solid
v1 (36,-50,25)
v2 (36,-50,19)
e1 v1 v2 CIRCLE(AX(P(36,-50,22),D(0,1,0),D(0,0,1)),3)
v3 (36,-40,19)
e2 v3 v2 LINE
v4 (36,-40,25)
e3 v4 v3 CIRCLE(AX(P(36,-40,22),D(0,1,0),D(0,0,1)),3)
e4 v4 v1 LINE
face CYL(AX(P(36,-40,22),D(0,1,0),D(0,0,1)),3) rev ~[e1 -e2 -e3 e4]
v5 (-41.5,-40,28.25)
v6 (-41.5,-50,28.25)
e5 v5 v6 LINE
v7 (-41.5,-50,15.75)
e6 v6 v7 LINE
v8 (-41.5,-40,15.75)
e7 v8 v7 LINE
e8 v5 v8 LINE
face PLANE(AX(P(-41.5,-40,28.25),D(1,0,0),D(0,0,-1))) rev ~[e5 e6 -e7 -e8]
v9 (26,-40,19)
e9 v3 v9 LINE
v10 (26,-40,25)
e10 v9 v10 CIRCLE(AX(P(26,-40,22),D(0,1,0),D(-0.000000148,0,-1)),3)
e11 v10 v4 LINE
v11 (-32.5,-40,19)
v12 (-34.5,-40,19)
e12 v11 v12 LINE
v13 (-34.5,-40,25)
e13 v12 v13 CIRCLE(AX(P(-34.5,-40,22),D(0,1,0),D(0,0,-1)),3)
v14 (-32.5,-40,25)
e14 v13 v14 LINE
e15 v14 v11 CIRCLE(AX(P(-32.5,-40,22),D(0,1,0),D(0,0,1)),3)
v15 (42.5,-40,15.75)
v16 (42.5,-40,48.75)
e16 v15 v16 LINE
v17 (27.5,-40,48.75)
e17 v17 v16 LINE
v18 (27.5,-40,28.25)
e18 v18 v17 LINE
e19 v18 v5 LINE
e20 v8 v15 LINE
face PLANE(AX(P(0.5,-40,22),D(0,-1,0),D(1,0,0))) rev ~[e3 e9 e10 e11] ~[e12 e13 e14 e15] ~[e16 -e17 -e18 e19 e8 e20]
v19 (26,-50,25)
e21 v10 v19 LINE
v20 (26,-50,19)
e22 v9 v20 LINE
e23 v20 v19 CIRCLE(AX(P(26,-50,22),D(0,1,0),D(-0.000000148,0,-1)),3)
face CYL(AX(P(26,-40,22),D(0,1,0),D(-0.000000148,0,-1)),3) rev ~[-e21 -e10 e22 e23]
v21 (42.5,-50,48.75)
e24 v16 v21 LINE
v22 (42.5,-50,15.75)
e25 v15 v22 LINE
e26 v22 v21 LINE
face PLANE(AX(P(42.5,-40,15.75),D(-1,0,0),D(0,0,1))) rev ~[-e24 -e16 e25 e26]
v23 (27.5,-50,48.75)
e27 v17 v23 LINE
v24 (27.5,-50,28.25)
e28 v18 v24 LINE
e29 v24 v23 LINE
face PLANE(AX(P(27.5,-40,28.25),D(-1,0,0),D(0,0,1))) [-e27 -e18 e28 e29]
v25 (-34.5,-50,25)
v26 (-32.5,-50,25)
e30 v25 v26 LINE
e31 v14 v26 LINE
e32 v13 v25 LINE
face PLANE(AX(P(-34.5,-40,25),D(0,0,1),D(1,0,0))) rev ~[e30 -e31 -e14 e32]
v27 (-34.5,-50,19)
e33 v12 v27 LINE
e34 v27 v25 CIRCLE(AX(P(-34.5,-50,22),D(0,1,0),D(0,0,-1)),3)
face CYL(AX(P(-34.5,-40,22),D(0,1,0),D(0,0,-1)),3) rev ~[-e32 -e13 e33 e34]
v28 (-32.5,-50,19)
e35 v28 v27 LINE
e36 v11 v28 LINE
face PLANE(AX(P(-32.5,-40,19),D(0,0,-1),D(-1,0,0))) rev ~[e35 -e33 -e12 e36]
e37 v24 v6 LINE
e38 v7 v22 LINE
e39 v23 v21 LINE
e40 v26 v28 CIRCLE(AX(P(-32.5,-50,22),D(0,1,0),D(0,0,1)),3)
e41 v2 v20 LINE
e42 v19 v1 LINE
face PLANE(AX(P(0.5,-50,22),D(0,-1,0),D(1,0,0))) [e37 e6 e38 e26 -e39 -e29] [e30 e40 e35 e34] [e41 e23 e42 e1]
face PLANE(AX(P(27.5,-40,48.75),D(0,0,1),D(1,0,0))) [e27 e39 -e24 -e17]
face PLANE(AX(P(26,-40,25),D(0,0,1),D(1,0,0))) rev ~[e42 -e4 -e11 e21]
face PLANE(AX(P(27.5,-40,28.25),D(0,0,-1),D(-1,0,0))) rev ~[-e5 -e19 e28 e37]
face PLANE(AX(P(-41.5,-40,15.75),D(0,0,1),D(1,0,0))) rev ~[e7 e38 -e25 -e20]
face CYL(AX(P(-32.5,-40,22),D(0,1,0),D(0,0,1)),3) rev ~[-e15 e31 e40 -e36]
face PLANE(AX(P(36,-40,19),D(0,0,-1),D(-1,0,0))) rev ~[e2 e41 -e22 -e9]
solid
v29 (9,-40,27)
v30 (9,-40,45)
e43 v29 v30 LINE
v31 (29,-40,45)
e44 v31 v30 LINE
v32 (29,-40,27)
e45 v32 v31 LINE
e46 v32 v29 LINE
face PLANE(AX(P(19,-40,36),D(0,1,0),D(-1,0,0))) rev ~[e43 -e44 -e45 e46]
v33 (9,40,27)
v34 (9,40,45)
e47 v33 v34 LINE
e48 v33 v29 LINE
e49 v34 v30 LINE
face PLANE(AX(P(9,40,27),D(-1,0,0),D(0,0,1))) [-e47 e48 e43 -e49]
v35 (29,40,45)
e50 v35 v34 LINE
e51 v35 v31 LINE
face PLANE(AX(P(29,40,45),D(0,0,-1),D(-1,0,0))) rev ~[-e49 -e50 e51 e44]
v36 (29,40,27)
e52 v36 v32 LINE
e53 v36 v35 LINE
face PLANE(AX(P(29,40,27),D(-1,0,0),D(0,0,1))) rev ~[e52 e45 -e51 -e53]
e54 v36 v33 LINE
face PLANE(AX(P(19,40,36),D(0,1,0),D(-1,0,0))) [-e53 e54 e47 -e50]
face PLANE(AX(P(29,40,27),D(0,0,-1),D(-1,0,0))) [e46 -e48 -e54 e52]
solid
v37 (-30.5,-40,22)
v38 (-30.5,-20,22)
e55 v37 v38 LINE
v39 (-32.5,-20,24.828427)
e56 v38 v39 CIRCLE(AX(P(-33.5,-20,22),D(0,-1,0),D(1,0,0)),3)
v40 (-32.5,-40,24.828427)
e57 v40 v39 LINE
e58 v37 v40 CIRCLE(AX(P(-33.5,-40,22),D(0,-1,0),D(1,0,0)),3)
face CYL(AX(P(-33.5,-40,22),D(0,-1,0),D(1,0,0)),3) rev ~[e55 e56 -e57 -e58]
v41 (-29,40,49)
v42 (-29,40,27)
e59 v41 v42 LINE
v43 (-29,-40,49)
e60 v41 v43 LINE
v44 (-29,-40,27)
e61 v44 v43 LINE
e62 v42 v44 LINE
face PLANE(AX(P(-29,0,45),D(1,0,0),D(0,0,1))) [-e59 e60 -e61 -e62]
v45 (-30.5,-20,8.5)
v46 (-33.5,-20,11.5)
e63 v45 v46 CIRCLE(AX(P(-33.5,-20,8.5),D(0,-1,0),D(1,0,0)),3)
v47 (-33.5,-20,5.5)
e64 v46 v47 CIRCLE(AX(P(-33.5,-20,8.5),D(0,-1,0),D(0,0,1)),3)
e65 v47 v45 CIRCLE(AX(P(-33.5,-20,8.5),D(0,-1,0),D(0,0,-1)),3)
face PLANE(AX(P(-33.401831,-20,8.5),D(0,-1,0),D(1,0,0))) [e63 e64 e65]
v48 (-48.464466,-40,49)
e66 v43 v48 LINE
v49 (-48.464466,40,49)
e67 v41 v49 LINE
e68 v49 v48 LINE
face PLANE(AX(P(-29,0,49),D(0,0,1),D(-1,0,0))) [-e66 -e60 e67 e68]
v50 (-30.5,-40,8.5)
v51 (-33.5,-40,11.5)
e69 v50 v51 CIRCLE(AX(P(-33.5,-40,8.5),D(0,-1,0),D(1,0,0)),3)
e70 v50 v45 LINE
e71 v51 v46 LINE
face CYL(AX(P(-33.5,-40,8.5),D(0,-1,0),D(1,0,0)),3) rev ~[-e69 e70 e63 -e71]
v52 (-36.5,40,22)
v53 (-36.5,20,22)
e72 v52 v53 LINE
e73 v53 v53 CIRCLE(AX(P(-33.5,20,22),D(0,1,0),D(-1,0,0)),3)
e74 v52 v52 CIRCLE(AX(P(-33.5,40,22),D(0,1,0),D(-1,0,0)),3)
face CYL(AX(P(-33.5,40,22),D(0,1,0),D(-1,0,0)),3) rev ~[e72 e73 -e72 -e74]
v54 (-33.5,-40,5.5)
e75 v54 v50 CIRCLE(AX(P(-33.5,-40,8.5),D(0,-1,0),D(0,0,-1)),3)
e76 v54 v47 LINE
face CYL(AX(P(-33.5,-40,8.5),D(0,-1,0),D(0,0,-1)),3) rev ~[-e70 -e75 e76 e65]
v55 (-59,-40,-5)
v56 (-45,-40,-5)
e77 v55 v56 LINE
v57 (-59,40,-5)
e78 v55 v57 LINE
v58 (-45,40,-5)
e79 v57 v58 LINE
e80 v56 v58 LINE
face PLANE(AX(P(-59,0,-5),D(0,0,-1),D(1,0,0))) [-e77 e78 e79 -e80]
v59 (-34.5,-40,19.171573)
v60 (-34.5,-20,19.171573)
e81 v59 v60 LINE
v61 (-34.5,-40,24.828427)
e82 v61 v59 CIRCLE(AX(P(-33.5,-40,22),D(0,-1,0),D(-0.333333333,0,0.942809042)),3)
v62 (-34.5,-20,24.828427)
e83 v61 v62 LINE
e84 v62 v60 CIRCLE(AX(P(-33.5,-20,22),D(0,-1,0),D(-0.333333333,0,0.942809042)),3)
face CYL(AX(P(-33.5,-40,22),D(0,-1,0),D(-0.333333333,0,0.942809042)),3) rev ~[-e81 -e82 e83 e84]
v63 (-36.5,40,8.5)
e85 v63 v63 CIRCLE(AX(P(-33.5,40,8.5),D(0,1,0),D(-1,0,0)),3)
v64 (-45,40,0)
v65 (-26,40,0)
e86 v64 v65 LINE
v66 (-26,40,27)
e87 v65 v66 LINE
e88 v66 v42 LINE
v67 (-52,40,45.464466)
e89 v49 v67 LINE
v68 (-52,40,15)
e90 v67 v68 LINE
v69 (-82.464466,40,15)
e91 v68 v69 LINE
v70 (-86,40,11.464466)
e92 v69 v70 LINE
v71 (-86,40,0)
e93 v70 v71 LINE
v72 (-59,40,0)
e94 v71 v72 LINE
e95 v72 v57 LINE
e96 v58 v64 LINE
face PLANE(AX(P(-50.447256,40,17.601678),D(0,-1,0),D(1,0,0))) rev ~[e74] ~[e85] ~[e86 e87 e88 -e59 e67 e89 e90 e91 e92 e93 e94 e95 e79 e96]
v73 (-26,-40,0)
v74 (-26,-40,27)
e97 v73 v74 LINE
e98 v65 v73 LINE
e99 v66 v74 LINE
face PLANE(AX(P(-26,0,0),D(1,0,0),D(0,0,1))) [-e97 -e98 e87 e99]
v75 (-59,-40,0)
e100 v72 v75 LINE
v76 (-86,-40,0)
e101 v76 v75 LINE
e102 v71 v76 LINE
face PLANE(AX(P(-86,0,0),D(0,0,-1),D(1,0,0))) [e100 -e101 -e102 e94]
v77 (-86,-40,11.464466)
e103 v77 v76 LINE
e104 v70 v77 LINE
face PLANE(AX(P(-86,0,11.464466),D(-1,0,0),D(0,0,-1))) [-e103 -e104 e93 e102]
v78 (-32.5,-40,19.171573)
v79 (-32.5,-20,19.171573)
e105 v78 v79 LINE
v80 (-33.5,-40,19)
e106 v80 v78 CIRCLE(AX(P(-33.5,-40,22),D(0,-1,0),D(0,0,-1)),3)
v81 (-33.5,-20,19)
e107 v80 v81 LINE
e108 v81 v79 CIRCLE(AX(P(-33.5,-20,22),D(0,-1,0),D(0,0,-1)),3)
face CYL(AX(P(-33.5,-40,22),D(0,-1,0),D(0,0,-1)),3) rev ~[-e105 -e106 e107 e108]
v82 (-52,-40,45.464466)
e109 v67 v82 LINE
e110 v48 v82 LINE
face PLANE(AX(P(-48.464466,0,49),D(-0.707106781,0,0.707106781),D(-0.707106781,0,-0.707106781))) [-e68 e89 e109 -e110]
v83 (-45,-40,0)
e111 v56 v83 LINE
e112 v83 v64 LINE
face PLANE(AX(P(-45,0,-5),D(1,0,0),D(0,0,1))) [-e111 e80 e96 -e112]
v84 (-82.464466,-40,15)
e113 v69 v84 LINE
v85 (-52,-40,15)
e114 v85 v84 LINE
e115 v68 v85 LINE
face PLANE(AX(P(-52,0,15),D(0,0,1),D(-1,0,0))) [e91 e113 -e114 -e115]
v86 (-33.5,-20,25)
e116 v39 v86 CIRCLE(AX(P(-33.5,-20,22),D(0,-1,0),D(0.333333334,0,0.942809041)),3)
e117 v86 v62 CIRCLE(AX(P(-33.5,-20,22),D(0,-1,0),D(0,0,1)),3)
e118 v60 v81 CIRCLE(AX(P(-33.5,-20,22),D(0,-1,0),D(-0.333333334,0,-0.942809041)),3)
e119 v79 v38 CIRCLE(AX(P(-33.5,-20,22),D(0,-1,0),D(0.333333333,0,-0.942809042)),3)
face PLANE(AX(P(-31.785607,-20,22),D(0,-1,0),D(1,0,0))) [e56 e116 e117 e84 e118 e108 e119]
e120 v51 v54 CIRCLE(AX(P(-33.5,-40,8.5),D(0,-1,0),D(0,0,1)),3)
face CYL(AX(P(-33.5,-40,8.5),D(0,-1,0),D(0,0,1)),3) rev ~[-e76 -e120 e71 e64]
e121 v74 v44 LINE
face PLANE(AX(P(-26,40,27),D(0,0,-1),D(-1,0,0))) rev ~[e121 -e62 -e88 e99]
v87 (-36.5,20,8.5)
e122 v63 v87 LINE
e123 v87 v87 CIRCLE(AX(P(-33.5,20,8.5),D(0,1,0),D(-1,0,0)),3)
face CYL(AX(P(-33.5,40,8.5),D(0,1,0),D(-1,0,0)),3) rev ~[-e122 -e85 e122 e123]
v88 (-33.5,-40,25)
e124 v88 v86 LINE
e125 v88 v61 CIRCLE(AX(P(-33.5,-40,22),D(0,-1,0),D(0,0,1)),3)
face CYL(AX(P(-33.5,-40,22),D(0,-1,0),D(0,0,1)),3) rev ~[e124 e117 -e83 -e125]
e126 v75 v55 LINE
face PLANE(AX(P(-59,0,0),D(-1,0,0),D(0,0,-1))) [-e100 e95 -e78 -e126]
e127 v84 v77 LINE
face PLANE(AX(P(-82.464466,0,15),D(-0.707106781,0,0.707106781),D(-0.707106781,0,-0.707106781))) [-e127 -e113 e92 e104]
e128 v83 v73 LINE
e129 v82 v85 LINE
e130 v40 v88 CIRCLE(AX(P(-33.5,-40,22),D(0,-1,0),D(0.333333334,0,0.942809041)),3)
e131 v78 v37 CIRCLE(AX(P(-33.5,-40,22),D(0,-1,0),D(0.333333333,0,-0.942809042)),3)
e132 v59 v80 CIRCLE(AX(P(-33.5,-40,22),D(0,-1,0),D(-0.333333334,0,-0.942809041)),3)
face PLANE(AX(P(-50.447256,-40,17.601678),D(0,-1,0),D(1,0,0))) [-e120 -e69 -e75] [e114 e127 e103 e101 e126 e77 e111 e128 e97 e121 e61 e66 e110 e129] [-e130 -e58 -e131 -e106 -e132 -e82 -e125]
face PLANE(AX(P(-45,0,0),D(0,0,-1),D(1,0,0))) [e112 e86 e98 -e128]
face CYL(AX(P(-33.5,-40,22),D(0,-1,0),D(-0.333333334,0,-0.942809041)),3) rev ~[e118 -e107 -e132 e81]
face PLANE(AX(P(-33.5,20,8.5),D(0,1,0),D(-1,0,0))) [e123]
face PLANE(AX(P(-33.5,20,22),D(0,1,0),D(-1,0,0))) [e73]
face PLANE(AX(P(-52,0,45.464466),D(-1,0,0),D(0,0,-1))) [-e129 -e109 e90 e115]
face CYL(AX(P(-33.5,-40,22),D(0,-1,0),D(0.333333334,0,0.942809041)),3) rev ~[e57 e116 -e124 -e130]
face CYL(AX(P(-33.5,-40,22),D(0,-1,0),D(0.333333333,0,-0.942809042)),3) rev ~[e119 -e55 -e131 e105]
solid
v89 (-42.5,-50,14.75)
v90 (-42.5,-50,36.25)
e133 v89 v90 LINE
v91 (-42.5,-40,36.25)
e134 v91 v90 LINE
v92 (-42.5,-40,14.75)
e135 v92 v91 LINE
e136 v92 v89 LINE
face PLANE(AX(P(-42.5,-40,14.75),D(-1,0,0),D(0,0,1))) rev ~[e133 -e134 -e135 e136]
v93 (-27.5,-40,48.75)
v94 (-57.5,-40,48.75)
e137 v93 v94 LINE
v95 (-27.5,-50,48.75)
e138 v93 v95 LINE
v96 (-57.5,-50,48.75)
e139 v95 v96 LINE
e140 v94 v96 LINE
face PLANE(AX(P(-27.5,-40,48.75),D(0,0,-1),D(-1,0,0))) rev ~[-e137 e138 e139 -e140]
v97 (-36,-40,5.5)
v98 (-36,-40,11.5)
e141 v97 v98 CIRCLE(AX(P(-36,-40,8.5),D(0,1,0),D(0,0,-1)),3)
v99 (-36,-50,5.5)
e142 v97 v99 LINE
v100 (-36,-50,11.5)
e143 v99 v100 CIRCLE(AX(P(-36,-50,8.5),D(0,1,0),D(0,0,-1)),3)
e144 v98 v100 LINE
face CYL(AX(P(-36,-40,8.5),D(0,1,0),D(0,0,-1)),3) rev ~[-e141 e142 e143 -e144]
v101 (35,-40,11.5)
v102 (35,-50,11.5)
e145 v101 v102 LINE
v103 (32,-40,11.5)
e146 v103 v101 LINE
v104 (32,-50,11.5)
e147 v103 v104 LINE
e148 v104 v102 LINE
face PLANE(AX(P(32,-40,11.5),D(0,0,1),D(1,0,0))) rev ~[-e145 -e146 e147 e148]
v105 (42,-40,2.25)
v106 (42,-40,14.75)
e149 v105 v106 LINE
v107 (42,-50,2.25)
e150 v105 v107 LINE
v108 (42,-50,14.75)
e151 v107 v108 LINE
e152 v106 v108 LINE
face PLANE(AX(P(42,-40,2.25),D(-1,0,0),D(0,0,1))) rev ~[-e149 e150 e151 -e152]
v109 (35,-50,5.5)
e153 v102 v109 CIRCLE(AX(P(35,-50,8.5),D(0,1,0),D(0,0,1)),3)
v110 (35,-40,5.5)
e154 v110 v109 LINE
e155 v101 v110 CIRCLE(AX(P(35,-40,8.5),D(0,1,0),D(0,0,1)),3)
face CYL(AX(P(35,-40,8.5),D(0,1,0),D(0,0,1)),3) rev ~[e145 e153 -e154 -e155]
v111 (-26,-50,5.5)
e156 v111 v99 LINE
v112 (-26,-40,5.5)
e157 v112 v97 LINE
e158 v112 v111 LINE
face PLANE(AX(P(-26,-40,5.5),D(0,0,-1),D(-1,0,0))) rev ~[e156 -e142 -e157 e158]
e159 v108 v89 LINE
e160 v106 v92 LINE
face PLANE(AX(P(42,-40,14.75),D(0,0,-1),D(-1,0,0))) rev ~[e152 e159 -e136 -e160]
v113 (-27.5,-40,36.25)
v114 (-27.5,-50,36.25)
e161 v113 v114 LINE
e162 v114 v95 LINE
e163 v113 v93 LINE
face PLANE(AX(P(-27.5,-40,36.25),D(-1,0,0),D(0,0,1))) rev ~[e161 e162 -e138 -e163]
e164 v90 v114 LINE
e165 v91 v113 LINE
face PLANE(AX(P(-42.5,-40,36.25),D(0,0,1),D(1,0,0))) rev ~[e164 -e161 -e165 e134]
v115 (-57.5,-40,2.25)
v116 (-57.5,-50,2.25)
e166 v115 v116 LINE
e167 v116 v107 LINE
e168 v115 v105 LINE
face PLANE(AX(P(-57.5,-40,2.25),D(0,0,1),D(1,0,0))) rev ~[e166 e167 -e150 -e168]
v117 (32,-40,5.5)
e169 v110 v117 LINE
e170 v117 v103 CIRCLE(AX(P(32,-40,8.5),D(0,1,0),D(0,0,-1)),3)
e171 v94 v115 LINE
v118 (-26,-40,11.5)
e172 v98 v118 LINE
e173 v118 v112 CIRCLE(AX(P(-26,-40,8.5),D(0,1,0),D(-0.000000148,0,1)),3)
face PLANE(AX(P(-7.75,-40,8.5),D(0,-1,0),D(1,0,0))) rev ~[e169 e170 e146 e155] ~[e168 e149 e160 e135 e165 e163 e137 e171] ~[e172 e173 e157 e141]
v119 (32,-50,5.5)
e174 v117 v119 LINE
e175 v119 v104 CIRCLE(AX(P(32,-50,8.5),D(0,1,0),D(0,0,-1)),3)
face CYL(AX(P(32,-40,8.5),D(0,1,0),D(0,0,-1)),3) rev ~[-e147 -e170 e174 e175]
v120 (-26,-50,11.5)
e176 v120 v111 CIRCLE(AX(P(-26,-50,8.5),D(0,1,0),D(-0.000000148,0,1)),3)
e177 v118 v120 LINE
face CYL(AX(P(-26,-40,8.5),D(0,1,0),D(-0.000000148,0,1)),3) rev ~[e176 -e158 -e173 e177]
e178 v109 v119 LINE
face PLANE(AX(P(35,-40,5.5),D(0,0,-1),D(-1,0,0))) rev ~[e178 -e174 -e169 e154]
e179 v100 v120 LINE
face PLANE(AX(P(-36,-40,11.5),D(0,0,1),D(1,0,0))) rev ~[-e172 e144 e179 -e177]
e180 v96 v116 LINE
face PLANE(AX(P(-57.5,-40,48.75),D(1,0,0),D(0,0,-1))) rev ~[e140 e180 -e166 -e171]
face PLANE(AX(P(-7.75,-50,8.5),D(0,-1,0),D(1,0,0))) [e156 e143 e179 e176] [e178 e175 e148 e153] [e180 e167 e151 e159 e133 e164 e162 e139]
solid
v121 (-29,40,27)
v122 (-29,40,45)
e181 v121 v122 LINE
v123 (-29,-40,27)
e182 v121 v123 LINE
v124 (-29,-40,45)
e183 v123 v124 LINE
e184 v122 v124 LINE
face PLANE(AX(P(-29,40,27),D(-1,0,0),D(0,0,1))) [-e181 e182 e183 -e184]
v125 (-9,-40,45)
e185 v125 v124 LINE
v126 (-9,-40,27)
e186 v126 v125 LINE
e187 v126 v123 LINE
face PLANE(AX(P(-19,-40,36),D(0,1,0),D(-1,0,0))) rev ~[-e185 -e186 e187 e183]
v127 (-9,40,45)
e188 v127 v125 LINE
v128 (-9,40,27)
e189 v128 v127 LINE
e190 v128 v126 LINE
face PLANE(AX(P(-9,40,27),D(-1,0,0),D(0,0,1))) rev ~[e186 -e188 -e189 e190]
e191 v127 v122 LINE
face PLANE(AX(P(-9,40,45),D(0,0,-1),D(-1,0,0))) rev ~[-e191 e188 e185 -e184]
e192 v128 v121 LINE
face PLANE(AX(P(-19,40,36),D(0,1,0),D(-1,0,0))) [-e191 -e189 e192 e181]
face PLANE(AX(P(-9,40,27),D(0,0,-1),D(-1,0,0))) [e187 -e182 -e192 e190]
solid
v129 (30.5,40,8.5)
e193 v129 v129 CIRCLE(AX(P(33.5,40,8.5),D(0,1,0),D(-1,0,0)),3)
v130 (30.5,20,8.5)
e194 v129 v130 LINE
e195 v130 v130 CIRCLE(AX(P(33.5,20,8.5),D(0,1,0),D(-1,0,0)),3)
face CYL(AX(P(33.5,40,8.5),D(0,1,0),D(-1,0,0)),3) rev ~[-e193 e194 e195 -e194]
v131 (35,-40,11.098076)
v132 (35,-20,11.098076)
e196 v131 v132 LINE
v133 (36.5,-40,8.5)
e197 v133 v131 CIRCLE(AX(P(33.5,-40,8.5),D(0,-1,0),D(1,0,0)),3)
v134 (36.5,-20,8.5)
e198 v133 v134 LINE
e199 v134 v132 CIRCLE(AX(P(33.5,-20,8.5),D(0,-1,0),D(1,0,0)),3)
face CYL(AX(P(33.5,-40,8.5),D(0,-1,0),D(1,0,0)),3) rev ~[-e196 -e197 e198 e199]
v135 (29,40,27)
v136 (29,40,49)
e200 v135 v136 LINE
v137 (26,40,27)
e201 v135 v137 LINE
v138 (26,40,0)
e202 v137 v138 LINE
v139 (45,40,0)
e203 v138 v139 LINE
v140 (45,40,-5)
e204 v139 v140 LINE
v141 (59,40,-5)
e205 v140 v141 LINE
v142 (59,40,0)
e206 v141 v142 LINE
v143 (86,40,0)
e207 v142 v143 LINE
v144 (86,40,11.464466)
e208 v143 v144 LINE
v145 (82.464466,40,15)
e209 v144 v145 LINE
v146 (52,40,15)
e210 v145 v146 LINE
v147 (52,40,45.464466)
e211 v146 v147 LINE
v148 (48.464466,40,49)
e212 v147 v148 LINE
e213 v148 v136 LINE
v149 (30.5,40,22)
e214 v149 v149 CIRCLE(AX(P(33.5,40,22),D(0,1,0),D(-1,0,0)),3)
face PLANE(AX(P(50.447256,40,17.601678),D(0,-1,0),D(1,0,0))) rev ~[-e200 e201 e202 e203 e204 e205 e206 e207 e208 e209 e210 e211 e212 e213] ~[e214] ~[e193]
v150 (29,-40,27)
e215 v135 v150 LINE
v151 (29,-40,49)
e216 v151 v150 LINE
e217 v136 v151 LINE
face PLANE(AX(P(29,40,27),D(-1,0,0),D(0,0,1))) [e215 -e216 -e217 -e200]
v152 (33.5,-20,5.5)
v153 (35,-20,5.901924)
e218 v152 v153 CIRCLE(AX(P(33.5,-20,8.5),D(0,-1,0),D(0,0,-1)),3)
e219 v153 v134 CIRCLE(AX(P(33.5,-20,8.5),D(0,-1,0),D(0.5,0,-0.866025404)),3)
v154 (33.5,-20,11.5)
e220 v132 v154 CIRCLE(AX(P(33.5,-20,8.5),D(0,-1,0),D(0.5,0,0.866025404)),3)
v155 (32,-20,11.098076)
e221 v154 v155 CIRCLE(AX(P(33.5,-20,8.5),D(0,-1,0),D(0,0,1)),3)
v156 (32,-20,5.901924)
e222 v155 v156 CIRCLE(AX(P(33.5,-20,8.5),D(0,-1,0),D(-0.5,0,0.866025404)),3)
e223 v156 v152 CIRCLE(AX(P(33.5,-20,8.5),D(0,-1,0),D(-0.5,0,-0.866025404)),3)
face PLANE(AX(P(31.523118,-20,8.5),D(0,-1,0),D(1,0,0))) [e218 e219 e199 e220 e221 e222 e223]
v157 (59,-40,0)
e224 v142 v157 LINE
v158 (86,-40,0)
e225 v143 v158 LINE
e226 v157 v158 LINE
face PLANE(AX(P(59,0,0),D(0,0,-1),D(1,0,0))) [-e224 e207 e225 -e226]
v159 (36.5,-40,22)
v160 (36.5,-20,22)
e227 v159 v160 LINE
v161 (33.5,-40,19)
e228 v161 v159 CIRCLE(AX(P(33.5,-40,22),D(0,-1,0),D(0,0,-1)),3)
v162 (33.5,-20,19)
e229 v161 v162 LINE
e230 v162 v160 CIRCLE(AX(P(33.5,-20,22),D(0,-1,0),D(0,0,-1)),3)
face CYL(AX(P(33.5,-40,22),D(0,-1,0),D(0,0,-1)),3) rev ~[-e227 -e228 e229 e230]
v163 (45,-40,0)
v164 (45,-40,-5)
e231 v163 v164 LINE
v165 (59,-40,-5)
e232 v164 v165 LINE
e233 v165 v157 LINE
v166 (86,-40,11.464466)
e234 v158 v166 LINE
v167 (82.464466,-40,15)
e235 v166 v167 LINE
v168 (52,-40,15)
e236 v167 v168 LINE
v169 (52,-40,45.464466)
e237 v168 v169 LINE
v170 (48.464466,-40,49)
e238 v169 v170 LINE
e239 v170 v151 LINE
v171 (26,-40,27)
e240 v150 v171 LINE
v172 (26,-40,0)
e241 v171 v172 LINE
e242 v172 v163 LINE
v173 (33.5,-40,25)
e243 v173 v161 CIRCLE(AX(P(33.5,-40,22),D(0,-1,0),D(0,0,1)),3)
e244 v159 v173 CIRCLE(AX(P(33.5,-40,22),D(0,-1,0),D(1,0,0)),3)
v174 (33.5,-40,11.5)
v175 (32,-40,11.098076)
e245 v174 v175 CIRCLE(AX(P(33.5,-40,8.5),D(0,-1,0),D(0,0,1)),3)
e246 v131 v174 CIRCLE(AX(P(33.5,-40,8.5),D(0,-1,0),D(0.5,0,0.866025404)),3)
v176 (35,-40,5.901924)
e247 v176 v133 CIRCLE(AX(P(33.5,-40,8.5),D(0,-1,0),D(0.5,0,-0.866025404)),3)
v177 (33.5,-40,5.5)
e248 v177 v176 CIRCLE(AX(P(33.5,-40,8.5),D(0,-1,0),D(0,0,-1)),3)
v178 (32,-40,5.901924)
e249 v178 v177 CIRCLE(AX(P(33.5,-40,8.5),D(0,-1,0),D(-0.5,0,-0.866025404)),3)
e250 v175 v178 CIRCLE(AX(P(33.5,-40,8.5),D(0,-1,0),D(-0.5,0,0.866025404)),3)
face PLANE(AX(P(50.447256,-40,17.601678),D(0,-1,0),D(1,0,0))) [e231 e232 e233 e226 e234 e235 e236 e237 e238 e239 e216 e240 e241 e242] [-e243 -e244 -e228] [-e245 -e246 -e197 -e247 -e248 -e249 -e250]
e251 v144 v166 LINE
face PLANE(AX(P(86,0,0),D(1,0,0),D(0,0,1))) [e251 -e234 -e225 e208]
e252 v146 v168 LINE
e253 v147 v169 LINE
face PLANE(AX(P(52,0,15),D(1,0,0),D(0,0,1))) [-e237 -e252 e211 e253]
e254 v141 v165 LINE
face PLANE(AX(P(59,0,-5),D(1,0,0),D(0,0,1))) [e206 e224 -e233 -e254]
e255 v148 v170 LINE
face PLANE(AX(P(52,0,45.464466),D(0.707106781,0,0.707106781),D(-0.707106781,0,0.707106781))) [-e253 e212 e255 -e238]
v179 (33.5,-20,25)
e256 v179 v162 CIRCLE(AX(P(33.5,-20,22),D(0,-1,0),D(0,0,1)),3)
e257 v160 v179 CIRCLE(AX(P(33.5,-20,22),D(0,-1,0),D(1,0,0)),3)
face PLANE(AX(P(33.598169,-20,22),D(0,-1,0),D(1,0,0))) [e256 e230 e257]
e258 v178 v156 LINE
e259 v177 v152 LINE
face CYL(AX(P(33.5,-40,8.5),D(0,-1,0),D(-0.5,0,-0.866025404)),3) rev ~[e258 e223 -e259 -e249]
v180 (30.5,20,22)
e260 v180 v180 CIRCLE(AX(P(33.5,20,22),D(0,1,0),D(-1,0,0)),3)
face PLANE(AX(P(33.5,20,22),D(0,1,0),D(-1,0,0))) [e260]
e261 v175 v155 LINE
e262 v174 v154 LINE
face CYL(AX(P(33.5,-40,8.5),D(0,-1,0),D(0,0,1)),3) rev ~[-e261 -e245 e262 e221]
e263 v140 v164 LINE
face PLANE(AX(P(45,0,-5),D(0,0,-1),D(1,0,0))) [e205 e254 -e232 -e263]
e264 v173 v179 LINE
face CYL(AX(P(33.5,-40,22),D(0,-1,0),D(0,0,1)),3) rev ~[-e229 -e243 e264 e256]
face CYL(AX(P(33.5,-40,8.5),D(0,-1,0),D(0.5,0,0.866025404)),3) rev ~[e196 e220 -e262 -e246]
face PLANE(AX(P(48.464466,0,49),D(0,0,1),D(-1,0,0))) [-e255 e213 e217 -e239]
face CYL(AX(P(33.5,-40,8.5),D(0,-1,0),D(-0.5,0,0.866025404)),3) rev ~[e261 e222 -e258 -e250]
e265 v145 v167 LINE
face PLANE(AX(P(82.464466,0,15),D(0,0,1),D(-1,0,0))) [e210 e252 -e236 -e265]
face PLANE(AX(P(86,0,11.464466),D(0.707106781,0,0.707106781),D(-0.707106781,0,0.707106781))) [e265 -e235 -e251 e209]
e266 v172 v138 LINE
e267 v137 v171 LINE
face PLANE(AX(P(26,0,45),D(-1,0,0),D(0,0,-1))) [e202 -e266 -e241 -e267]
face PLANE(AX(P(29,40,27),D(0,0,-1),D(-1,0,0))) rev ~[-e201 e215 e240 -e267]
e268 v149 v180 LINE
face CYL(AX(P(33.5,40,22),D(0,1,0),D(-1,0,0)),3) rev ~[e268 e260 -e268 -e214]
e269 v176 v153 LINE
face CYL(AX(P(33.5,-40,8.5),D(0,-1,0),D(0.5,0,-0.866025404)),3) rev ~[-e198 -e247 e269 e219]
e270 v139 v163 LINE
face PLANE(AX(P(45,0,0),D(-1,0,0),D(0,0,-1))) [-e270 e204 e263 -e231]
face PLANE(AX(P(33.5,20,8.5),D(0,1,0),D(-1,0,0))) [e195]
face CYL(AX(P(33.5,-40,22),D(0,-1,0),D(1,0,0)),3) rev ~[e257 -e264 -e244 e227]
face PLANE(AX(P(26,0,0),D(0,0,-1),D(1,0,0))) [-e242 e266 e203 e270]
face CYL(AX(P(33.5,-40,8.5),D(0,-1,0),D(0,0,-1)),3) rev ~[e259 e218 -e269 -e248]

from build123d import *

# Parameters (mm, degrees)
F1_DEPTH  = 40
F2_W      = 3
F2_H      = 18
F3_W      = 3
F3_H      = 18
F4_DEPTH  = 80
F5_W      = 15
F5_H      = 20.5
F6_DEPTH  = 10
F7_DEPTH  = 20
F10_DEPTH = 20
F9_W      = 15
F9_H      = 12.5
F11_DEPTH = 10
F12_W     = 20
F12_H     = 18
F13_DEPTH = 80
F14_R     = 3
F15_DEPTH = 20


# Not quite as in the source:
# - a feature names something its author has since deleted; it is built from what else it names


with BuildPart() as f1:
    # F0 (on Front) → F1 (new body, symmetric)
    with BuildSketch(Plane.XZ):
        Polygon((-45, 0), (-26, 0), (-26, 45), (-29, 45), (-29, 49), (-48.4644660941, 49), (-52, 45.4644660941), (-52, 15), (-82.4644660941, 15), (-86, 11.4644660941), (-86, 0), (-59, 0), (-59, -5), (-45, -5), align=None)
    extrude(amount=F1_DEPTH, both=True)


with BuildPart() as f1b:
    # F0 (on Front) → F1, piece 2 (new body, symmetric)
    with BuildSketch(Plane.XZ):
        Polygon((26, 0), (45, 0), (45, -5), (59, -5), (59, 0), (86, 0), (86, 11.4644660941), (82.4644660941, 15), (52, 15), (52, 45.4644660941), (48.4644660941, 49), (29, 49), (29, 45), (26, 45), align=None)
    extrude(amount=F1_DEPTH, both=True)


with BuildPart() as f4_tool:
    # F2 (on face) + F3 (on face) → F4 (new body)
    with BuildSketch(Plane(origin=(0, 40, 0), x_dir=(-1, 0, 0), z_dir=(0, 1, 0))):
        with Locations((-27.5, 36)):
            Rectangle(F2_W, F2_H)
    with BuildSketch(Plane(origin=(0, 40, 0), x_dir=(-1, 0, 0), z_dir=(0, 1, 0))):
        with Locations((27.5, 36)):
            Rectangle(F3_W, F3_H)
    extrude(amount=-F4_DEPTH)


with BuildPart() as f1_1:
    add(f1.part)

    # F4: cut by f4_tool
    add(f4_tool.part, mode=Mode.SUBTRACT)


with BuildPart() as f1b_1:
    add(f1b.part)

    # F4: cut by f4_tool
    add(f4_tool.part, mode=Mode.SUBTRACT)


with BuildPart() as f6:
    # F5 (on face) → F6 (new body)
    with BuildSketch(Plane.XZ.offset(40)):
        Polygon((-41.5, 28.25), (-41.5, 15.75), (42.5, 15.75), (42.5, 28.25), (27.5, 28.25), align=None)
        with BuildLine():
            Line((-34.5, 25), (-33.5, 25))
            Line((-33.5, 25), (-32.5, 25))
            ThreePointArc((-32.5, 25), (-29.5, 22), (-32.5, 19))
            Line((-32.5, 19), (-33.5, 19))
            Line((-33.5, 19), (-34.5, 19))
            ThreePointArc((-34.5, 19), (-37.5, 22), (-34.5, 25))
        make_face(mode=Mode.SUBTRACT)
        with BuildLine():
            Line((25.9999999072, 25), (33.5, 25))
            Line((33.5, 25), (36.0000002221, 25))
            ThreePointArc((36.0000002221, 25), (39.0000002221, 21.9999999354), (36.0000000928, 19))
            Line((36.0000000928, 19), (33.5, 19))
            Line((33.5, 19), (25.9999997779, 19))
            ThreePointArc((25.9999997779, 19), (23.0000002221, 22.0000000646), (25.9999999072, 25))
        make_face(mode=Mode.SUBTRACT)
        with Locations((35, 38.5)):
            Rectangle(F5_W, F5_H)
    extrude(amount=F6_DEPTH)


with BuildPart() as f7_tool:
    # F5 (on face) → F7 (new body)
    with BuildSketch(Plane.XZ.offset(40)):
        with BuildLine():
            ThreePointArc((-32.5, 19.1715728753), (-31.0505102572, 20.2679491924), (-30.5, 22))
            ThreePointArc((-30.5, 22), (-31.0505102572, 23.7320508076), (-32.5, 24.8284271247))
            Line((-32.5, 24.8284271247), (-32.5, 19.1715728753))
        make_face()
        with BuildLine():
            Line((-32.5, 19.1715728753), (-32.5, 24.8284271247))
            ThreePointArc((-32.5, 24.8284271247), (-32.9926940638, 24.956795679), (-33.5, 25))
            ThreePointArc((-33.5, 25), (-34.0073059362, 24.956795679), (-34.5, 24.8284271247))
            Line((-34.5, 24.8284271247), (-34.5, 19.1715728753))
            ThreePointArc((-34.5, 19.1715728753), (-34.0073059362, 19.043204321), (-33.5, 19))
            ThreePointArc((-33.5, 19), (-32.9926940638, 19.043204321), (-32.5, 19.1715728753))
        make_face()
        with BuildLine():
            Line((-34.5, 19.1715728753), (-34.5, 24.8284271247))
            ThreePointArc((-34.5, 24.8284271247), (-36.5, 22), (-34.5, 19.1715728753))
        make_face()
        with BuildLine():
            ThreePointArc((33.5, 19), (35.6213203436, 19.8786796564), (36.5, 22))
            ThreePointArc((36.5, 22), (35.6213203436, 24.1213203436), (33.5, 25))
            ThreePointArc((33.5, 25), (30.5, 22), (33.5, 19))
        make_face()
    extrude(amount=-F7_DEPTH)


with BuildPart() as f1_2:
    add(f1_1.part)

    # F7: cut by f7_tool
    add(f7_tool.part, mode=Mode.SUBTRACT)


with BuildPart() as f1b_2:
    add(f1b_1.part)

    # F7: cut by f7_tool
    add(f7_tool.part, mode=Mode.SUBTRACT)


with BuildPart() as f10_tool:
    # F9 (on face) → F10 (new body)
    with BuildSketch(Plane.XZ.offset(40)):
        with BuildLine():
            ThreePointArc((-33.5, 5.5), (-31.3786796564, 6.3786796564), (-30.5, 8.5))
            ThreePointArc((-30.5, 8.5), (-31.3786796564, 10.6213203436), (-33.5, 11.5))
            ThreePointArc((-33.5, 11.5), (-36.5, 8.5), (-33.5, 5.5))
        make_face()
        with BuildLine():
            Line((32, 5.9019237886), (32, 11.0980762114))
            ThreePointArc((32, 11.0980762114), (30.5, 8.5), (32, 5.9019237886))
        make_face()
        with BuildLine():
            Line((35, 5.9019237886), (35, 11.0980762114))
            ThreePointArc((35, 11.0980762114), (34.2764571353, 11.3977774789), (33.5, 11.5))
            ThreePointArc((33.5, 11.5), (32.7235428647, 11.3977774789), (32, 11.0980762114))
            Line((32, 11.0980762114), (32, 5.9019237886))
            ThreePointArc((32, 5.9019237886), (32.7235428647, 5.6022225211), (33.5, 5.5))
            ThreePointArc((33.5, 5.5), (34.2764571353, 5.6022225211), (35, 5.9019237886))
        make_face()
        with BuildLine():
            ThreePointArc((35, 5.9019237886), (36.0980762114, 7), (36.5, 8.5))
            ThreePointArc((36.5, 8.5), (36.0980762114, 10), (35, 11.0980762114))
            Line((35, 11.0980762114), (35, 5.9019237886))
        make_face()
    extrude(amount=-F10_DEPTH)


with BuildPart() as f1_3:
    add(f1_2.part)

    # F10: cut by f10_tool
    add(f10_tool.part, mode=Mode.SUBTRACT)


with BuildPart() as f1b_3:
    add(f1b_2.part)

    # F10: cut by f10_tool
    add(f10_tool.part, mode=Mode.SUBTRACT)


with BuildPart() as f11:
    # F9 (on face) → F11 (new body)
    with BuildSketch(Plane.XZ.offset(40)):
        Polygon((-57.5, 14.75), (-57.5, 2.25), (42, 2.25), (42, 14.75), (-42.5, 14.75), align=None)
        with BuildLine():
            Line((-36.0000002215, 11.5), (-33.5, 11.5))
            Line((-33.5, 11.5), (-26.0000002215, 11.5))
            ThreePointArc((-26.0000002215, 11.5), (-22.9999997785, 8.5000002215), (-25.9999997785, 5.5))
            Line((-25.9999997785, 5.5), (-33.5, 5.5))
            Line((-33.5, 5.5), (-35.9999997785, 5.5))
            ThreePointArc((-35.9999997785, 5.5), (-38.9999997785, 8.4999997785), (-36.0000002215, 11.5))
        make_face(mode=Mode.SUBTRACT)
        with BuildLine():
            Line((32, 11.5), (33.5, 11.5))
            Line((33.5, 11.5), (35, 11.5))
            ThreePointArc((35, 11.5), (38, 8.5), (35, 5.5))
            Line((35, 5.5), (33.5, 5.5))
            Line((33.5, 5.5), (32, 5.5))
            ThreePointArc((32, 5.5), (29, 8.5), (32, 11.5))
        make_face(mode=Mode.SUBTRACT)
        Polygon((-57.5, 48.75), (-57.5, 14.75), (-42.5, 14.75), (-42.5, 36.25), (-42.5, 48.75), align=None)
        with Locations((-35, 42.5)):
            Rectangle(F9_W, F9_H)
    extrude(amount=F11_DEPTH)


with BuildPart() as f13:
    # F12 (on face) → F13 (new body)
    with BuildSketch(Plane(origin=(0, 40, 0), x_dir=(-1, 0, 0), z_dir=(0, 1, 0))):
        with Locations((-19, 36)):
            Rectangle(F12_W, F12_H)
    extrude(amount=-F13_DEPTH)


with BuildPart() as f13b:
    # F12 (on face) → F13, piece 2 (new body)
    with BuildSketch(Plane(origin=(0, 40, 0), x_dir=(-1, 0, 0), z_dir=(0, 1, 0))):
        with Locations((19, 36)):
            Rectangle(F12_W, F12_H)
    extrude(amount=-F13_DEPTH)


with BuildPart() as f15_tool:
    # F14 (on face) → F15 (new body)
    with BuildSketch(Plane(origin=(0, 40, 0), x_dir=(-1, 0, 0), z_dir=(0, 1, 0))):
        with Locations((-33.5, 22)):
            Circle(F14_R)
        with Locations((-33.5, 8.5)):
            Circle(F14_R)
        with Locations((33.5, 8.5)):
            Circle(F14_R)
        with Locations((33.5, 22)):
            Circle(F14_R)
    extrude(amount=-F15_DEPTH)


with BuildPart() as f1_4:
    add(f1_3.part)

    # F15: cut by f15_tool
    add(f15_tool.part, mode=Mode.SUBTRACT)


with BuildPart() as f1b_4:
    add(f1b_3.part)

    # F15: cut by f15_tool
    add(f15_tool.part, mode=Mode.SUBTRACT)


solid = Compound([f6.part, f11.part, f13.part, f13b.part, f1_4.part, f1b_4.part])
